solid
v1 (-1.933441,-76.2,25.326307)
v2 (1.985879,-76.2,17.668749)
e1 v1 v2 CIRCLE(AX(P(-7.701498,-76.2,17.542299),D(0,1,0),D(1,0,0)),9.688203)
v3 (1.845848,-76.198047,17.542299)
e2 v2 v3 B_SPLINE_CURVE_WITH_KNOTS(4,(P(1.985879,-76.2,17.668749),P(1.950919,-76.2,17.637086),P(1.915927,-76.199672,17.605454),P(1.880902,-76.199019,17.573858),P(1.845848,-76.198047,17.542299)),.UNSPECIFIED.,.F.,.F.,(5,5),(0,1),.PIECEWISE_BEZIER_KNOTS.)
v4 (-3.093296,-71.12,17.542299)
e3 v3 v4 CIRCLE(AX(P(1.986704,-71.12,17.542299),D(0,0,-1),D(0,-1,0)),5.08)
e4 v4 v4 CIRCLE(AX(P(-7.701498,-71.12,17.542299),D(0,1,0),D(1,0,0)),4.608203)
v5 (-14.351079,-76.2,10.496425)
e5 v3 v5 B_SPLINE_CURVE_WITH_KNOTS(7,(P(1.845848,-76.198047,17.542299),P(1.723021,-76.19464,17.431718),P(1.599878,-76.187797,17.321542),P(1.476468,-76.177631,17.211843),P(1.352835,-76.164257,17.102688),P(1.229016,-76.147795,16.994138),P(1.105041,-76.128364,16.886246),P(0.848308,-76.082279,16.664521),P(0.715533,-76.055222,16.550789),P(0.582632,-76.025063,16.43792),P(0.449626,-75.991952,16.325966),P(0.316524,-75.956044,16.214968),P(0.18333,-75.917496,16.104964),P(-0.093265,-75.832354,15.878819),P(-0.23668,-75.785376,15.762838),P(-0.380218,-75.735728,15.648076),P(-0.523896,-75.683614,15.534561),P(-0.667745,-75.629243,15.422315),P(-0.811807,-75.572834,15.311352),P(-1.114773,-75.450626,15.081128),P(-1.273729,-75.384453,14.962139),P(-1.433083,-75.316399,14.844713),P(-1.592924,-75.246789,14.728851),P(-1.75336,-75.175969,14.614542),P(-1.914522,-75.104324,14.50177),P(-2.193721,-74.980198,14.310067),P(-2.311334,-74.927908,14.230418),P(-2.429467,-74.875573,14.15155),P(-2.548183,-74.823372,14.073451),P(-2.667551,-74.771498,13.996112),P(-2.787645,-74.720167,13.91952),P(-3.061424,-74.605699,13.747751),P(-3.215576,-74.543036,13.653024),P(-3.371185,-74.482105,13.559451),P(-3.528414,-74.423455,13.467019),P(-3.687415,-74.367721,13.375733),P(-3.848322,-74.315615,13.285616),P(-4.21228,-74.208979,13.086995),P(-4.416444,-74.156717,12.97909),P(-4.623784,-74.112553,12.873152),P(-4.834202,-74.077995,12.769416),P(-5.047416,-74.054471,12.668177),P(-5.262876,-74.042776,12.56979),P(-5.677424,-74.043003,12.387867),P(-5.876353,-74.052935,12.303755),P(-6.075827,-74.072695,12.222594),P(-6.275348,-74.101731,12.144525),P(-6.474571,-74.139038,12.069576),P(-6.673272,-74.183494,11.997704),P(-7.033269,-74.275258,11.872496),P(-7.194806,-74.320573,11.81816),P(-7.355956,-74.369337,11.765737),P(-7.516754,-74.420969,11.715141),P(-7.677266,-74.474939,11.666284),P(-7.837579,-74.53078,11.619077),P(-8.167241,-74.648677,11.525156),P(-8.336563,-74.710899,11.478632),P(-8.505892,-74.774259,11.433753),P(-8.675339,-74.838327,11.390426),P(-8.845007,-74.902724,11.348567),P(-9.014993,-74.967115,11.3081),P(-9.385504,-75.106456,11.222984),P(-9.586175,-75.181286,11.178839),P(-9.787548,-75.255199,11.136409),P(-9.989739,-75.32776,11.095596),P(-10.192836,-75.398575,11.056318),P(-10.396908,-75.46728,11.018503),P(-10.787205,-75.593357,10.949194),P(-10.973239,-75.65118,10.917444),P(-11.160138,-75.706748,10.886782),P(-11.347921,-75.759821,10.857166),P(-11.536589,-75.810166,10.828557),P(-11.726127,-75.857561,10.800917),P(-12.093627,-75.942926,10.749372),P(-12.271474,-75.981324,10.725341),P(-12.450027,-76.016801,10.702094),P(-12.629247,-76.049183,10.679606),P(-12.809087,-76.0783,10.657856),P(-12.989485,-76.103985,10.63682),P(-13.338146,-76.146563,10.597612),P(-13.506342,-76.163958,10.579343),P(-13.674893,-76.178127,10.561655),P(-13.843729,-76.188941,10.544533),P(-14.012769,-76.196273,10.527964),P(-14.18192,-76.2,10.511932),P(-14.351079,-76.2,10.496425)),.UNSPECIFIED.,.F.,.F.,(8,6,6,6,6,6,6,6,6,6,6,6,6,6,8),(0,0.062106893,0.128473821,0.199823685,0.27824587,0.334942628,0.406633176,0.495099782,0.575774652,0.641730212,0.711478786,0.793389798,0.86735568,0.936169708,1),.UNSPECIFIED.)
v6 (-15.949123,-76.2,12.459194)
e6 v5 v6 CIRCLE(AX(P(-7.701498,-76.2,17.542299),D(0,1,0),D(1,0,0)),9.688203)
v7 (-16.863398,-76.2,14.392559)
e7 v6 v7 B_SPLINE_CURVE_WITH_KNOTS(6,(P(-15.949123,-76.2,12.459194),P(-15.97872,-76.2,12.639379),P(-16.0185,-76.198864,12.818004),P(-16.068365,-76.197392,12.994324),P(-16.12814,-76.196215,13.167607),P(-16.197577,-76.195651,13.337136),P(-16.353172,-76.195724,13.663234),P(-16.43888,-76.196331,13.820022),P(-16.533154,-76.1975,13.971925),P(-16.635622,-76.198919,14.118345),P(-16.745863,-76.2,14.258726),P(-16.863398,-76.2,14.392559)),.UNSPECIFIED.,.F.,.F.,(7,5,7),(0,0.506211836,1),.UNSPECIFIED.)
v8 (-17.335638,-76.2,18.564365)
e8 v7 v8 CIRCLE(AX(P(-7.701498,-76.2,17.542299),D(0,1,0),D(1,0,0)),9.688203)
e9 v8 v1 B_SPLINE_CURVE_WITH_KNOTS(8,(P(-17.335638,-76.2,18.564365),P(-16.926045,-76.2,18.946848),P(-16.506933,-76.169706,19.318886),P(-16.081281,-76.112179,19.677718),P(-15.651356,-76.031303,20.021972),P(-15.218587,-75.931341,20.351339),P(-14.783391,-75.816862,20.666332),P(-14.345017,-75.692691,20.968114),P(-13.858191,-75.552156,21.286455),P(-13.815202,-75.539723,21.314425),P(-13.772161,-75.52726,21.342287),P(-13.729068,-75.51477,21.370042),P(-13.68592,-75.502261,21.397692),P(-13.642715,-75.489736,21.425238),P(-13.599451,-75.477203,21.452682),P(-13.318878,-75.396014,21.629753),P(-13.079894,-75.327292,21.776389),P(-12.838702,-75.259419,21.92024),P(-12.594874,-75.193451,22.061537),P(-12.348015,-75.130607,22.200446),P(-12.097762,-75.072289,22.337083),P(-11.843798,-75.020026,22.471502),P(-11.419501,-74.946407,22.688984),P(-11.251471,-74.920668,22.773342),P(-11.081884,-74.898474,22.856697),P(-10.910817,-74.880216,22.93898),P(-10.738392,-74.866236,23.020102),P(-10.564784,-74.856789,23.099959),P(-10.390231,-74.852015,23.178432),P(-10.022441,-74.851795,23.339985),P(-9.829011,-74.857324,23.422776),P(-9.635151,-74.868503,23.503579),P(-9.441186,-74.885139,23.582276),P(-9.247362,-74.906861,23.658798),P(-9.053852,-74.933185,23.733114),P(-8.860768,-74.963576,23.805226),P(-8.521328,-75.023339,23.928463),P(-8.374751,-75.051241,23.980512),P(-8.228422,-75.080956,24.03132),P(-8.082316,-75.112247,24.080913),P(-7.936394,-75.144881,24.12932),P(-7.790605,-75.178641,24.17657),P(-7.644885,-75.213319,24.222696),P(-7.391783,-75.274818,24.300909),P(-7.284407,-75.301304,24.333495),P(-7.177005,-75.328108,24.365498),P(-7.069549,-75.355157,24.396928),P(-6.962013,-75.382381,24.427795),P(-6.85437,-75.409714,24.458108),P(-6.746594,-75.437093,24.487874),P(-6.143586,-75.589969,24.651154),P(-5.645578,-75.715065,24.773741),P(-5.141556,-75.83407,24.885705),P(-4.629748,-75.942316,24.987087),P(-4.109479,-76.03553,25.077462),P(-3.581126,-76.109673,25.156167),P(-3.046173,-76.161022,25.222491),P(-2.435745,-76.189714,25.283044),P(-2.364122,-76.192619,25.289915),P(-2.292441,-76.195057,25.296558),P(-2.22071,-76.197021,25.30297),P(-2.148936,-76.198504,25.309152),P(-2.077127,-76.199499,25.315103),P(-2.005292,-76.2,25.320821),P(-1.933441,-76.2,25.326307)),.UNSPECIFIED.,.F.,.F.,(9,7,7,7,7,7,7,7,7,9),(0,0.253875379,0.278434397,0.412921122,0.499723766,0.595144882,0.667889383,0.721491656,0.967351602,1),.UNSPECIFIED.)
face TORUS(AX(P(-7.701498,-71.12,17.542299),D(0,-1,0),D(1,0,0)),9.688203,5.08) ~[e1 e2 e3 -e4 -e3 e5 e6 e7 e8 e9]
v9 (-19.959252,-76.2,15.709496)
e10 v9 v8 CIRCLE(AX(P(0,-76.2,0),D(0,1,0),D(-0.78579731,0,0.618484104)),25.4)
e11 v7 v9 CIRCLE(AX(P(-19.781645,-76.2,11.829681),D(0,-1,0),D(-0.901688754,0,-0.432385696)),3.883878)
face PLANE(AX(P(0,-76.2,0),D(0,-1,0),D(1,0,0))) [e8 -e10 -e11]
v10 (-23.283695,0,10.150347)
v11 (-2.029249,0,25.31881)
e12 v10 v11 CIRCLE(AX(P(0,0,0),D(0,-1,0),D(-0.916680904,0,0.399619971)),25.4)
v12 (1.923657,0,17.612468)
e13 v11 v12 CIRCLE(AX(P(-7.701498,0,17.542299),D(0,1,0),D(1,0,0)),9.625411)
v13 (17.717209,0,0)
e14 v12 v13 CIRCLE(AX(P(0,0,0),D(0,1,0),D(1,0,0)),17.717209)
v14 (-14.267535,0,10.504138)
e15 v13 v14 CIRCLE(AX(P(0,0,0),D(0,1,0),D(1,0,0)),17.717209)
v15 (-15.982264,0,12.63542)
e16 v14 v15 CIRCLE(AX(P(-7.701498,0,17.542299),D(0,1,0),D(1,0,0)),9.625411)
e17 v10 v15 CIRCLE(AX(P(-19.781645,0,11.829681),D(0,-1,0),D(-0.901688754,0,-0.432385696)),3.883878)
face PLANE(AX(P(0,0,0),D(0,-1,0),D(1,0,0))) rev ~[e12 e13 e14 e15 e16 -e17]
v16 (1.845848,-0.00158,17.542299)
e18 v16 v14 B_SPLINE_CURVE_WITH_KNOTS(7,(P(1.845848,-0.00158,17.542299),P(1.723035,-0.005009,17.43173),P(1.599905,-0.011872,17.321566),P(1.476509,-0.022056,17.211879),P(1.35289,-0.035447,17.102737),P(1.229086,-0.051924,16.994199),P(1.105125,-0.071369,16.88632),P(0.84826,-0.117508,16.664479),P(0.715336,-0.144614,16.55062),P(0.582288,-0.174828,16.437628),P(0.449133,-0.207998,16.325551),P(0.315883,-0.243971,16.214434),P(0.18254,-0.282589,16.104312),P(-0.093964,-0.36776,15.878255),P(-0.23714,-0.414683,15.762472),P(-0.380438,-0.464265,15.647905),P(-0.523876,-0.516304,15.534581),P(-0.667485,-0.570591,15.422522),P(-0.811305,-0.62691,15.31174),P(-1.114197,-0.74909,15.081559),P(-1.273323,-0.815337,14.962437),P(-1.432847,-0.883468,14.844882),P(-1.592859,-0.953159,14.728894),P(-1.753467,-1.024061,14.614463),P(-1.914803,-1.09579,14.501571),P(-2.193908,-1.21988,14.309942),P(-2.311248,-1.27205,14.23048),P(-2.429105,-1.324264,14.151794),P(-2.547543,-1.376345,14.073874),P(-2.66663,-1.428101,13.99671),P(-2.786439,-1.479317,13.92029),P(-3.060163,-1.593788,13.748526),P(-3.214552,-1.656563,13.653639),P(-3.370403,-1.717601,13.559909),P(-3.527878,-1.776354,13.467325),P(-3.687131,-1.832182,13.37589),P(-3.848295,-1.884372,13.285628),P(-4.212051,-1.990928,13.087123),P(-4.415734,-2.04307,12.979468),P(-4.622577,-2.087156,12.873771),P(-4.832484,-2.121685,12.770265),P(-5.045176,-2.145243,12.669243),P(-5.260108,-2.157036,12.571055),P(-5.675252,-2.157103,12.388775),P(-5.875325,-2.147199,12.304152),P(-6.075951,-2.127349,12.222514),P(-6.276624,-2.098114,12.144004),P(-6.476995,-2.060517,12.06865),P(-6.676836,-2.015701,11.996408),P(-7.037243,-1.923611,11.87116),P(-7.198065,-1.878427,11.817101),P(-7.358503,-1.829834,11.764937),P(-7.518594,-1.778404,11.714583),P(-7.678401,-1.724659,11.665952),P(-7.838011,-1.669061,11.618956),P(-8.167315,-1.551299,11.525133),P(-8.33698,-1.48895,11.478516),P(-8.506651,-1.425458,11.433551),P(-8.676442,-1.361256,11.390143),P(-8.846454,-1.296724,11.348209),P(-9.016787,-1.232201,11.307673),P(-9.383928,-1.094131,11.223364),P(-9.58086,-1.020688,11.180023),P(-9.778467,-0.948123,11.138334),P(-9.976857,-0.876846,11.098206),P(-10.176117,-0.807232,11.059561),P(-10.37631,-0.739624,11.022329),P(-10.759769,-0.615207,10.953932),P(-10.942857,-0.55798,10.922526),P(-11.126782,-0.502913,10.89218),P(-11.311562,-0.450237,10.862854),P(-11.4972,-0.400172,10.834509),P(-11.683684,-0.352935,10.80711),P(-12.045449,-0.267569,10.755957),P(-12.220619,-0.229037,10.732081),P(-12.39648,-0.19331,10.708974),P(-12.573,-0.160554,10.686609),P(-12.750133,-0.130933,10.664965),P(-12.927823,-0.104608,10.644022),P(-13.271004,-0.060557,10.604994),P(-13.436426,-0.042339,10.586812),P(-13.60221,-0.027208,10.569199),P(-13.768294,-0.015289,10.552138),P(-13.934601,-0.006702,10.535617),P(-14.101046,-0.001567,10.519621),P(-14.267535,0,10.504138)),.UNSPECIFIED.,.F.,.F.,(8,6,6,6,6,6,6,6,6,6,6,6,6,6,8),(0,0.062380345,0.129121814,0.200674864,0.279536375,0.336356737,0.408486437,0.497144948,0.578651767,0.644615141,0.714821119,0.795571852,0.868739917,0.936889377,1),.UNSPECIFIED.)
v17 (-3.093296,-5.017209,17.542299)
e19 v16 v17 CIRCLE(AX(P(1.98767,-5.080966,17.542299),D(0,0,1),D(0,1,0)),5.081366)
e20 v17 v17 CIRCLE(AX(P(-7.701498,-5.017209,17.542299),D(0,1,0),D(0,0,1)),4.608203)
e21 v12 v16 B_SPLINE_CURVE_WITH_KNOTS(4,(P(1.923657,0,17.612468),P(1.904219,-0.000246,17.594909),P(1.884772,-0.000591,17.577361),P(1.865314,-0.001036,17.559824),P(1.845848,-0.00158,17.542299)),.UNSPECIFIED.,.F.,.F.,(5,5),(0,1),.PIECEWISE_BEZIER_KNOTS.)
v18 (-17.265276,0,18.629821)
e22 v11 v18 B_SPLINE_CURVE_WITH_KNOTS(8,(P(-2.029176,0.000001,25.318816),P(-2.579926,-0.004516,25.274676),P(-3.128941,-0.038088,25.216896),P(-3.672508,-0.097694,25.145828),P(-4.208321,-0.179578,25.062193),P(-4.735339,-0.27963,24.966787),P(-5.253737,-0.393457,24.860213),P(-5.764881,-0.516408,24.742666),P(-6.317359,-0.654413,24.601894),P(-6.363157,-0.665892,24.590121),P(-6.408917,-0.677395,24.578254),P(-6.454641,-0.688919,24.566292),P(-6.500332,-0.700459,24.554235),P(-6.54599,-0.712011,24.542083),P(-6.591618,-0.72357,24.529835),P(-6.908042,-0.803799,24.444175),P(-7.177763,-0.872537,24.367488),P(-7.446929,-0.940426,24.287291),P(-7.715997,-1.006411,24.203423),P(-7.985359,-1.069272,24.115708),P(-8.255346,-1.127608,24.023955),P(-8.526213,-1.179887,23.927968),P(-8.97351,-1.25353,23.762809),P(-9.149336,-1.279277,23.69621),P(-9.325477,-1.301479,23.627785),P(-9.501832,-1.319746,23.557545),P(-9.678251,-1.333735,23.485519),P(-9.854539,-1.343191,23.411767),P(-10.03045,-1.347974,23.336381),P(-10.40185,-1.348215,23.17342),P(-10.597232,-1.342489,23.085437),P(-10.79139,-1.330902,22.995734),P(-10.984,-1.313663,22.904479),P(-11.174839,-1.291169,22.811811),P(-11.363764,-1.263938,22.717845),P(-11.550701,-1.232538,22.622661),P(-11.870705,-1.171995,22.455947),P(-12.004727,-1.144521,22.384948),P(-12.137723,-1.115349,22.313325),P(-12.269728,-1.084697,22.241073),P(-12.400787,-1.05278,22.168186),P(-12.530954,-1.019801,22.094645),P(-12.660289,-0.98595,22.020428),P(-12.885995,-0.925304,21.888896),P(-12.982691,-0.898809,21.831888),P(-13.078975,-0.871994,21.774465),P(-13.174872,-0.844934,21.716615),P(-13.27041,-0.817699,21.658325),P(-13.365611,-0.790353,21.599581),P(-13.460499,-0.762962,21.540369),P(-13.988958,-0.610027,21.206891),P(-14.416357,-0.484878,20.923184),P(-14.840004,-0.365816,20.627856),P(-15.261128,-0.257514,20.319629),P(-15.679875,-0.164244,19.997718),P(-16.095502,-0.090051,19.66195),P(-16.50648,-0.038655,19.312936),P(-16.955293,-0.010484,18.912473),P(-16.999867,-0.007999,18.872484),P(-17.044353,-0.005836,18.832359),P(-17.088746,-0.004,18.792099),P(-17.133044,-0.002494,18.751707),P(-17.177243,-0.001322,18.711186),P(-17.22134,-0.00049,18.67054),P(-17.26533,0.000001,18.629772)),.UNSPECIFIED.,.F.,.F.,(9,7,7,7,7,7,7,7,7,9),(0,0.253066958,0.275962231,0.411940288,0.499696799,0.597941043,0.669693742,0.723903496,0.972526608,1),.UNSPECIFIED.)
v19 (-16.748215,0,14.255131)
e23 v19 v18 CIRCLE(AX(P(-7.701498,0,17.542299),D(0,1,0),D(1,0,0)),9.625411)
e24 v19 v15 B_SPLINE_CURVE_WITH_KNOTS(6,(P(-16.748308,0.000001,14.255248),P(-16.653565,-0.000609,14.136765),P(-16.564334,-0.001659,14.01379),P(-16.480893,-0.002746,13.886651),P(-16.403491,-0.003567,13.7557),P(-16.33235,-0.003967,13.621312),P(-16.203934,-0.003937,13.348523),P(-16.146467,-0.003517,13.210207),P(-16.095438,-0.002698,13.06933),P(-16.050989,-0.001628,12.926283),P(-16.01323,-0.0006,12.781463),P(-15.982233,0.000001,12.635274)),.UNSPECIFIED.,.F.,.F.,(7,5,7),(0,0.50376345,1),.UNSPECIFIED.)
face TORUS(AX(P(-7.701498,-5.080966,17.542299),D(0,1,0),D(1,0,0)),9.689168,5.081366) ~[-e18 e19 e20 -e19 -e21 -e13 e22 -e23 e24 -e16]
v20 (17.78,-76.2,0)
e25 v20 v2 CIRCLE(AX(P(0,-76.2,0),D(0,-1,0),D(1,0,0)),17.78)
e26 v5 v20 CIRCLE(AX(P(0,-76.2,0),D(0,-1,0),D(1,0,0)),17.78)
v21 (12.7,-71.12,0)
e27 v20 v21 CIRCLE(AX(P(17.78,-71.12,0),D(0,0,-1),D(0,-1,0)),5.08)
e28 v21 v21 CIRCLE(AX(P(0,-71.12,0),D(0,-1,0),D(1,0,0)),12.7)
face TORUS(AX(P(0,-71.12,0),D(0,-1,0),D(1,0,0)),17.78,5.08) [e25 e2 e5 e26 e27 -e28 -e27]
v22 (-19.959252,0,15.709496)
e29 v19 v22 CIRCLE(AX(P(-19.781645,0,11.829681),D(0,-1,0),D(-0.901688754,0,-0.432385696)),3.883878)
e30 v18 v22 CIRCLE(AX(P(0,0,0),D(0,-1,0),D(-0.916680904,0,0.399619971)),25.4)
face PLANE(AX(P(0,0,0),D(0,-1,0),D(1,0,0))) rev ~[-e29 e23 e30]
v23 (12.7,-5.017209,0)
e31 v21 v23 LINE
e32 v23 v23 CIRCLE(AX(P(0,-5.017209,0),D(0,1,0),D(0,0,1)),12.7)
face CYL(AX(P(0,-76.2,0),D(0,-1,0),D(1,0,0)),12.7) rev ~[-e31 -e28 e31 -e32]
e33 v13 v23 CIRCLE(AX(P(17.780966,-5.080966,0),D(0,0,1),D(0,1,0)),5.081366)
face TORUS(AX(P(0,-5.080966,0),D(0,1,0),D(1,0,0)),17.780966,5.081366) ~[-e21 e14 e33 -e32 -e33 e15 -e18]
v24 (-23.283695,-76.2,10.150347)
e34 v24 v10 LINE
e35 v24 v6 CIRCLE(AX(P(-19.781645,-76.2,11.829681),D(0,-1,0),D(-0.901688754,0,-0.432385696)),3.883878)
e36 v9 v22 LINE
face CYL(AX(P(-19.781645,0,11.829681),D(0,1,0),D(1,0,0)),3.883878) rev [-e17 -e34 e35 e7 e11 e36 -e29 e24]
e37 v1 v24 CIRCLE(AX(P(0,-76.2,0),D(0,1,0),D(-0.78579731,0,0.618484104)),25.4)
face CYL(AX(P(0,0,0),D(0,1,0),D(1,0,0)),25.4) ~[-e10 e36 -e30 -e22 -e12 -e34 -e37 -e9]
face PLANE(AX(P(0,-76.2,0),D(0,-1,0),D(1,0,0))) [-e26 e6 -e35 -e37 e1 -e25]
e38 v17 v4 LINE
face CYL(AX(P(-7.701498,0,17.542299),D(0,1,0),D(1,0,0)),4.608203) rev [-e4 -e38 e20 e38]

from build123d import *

# Parameters (mm, degrees)
F0_R     = 25.4
F1_DEPTH = 76.2
F2_R     = 12.7
F3_DEPTH = 105.41
F4_R     = 3.8838784961
F5_DEPTH = 133.35
F6_R     = 4.6082025667
F7_DEPTH = 145.542


# Not quite as in the source:
# - a fillet or chamfer that OpenCascade refuses, or shapes differently, is made with other operations: its cross-section is extruded or revolved along the edge and cut away or added


with BuildPart() as f1:
    # F0 (on Front) → F1 (new body)
    with BuildSketch(Plane.XZ):
        Circle(F0_R)
    extrude(amount=F1_DEPTH)

    # F2 (on face) → F3 (cut)
    with BuildSketch(Plane.XZ.offset(76.2)):
        Circle(F2_R)
    extrude(amount=-F3_DEPTH, mode=Mode.SUBTRACT)

    # F4 (on Front) → F5 (cut)
    with BuildSketch(Plane.XZ):
        with Locations((-19.7816453874, 11.8296807632)):
            Circle(F4_R)
    extrude(amount=F5_DEPTH, mode=Mode.SUBTRACT)

    # F6 (on Front) → F7 (cut)
    with BuildSketch(Plane.XZ):
        with Locations((-7.7014984563, 17.5422988832)):
            Circle(F6_R)
    extrude(amount=F7_DEPTH, mode=Mode.SUBTRACT)

    # F8: fillet of radius 5.08 on 2 edges, made by hand

    # F8_s1 → F8_t2 (revolve, cut)
    with BuildSketch(Plane.XY):
        with BuildLine():
            ThreePointArc((17.78, -76.2), (14.1878975516, -74.7121024484), (12.7, -71.12))
            Line((12.7, -71.12), (12.7, -76.2))
            Line((12.7, -76.2), (17.78, -76.2))
        make_face()
    revolve(axis=Axis((0, -76.2, 0), (0, -1, 0)), mode=Mode.SUBTRACT)

    # F8_s3 → F8_t4 (revolve, cut)
    with BuildSketch(Plane.XY.offset(17.5422988832)):
        with BuildLine():
            ThreePointArc((1.9867041104, -76.2), (-1.605398338, -74.7121024484), (-3.0932958896, -71.12))
            Line((-3.0932958896, -71.12), (-3.0932958896, -76.2))
            Line((-3.0932958896, -76.2), (1.9867041104, -76.2))
        make_face()
    revolve(axis=Axis((-7.7014984563, -76.2, 17.5422988832), (0, 1, 0)), mode=Mode.SUBTRACT)

    # F9: fillet of radius 5.08 on 2 edges, made by hand

    # F9_s1 → F9_t2 (revolve, cut)
    with BuildSketch(Plane.XY):
        with BuildLine():
            ThreePointArc((17.7809656854, 0.0004), (14.1878975516, -1.4878975516), (12.6996, -5.0809656854))
            Line((12.6996, -5.0809656854), (12.1914634315, -5.0809656854))
            ThreePointArc((12.1914634315, -5.0809656854), (12.1918634315, -2.5404828427), (12.1918634315, 0))
            Line((12.1918634315, 0), (12.7, 0.5081365685))
            ThreePointArc((12.7, 0.5081365685), (15.2404828427, 0.5081365685), (17.7809656854, 0.5085365685))
            Line((17.7809656854, 0.5085365685), (17.7809656854, 0.0004))
        make_face()
    revolve(axis=Axis((0, 0, 0), (0, -1, 0)), mode=Mode.SUBTRACT)

    # F9_s3 → F9_t4 (revolve, cut)
    with BuildSketch(Plane.XY.offset(17.5422988832)):
        with BuildLine():
            ThreePointArc((1.9876697958, 0.0004), (-1.605398338, -1.4878975516), (-3.0936958896, -5.0809656854))
            Line((-3.0936958896, -5.0809656854), (-3.6018324581, -5.0809656854))
            ThreePointArc((-3.6018324581, -5.0809656854), (-3.6014324581, -2.5404828427), (-3.6014324581, 0))
            Line((-3.6014324581, 0), (-3.0932958896, 0.5081365685))
            ThreePointArc((-3.0932958896, 0.5081365685), (-0.5528130469, 0.5081365685), (1.9876697958, 0.5085365685))
            Line((1.9876697958, 0.5085365685), (1.9876697958, 0.0004))
        make_face()
    revolve(axis=Axis((-7.7014984563, 0, 17.5422988832), (0, -1, 0)), mode=Mode.SUBTRACT)


solid = f1.part
